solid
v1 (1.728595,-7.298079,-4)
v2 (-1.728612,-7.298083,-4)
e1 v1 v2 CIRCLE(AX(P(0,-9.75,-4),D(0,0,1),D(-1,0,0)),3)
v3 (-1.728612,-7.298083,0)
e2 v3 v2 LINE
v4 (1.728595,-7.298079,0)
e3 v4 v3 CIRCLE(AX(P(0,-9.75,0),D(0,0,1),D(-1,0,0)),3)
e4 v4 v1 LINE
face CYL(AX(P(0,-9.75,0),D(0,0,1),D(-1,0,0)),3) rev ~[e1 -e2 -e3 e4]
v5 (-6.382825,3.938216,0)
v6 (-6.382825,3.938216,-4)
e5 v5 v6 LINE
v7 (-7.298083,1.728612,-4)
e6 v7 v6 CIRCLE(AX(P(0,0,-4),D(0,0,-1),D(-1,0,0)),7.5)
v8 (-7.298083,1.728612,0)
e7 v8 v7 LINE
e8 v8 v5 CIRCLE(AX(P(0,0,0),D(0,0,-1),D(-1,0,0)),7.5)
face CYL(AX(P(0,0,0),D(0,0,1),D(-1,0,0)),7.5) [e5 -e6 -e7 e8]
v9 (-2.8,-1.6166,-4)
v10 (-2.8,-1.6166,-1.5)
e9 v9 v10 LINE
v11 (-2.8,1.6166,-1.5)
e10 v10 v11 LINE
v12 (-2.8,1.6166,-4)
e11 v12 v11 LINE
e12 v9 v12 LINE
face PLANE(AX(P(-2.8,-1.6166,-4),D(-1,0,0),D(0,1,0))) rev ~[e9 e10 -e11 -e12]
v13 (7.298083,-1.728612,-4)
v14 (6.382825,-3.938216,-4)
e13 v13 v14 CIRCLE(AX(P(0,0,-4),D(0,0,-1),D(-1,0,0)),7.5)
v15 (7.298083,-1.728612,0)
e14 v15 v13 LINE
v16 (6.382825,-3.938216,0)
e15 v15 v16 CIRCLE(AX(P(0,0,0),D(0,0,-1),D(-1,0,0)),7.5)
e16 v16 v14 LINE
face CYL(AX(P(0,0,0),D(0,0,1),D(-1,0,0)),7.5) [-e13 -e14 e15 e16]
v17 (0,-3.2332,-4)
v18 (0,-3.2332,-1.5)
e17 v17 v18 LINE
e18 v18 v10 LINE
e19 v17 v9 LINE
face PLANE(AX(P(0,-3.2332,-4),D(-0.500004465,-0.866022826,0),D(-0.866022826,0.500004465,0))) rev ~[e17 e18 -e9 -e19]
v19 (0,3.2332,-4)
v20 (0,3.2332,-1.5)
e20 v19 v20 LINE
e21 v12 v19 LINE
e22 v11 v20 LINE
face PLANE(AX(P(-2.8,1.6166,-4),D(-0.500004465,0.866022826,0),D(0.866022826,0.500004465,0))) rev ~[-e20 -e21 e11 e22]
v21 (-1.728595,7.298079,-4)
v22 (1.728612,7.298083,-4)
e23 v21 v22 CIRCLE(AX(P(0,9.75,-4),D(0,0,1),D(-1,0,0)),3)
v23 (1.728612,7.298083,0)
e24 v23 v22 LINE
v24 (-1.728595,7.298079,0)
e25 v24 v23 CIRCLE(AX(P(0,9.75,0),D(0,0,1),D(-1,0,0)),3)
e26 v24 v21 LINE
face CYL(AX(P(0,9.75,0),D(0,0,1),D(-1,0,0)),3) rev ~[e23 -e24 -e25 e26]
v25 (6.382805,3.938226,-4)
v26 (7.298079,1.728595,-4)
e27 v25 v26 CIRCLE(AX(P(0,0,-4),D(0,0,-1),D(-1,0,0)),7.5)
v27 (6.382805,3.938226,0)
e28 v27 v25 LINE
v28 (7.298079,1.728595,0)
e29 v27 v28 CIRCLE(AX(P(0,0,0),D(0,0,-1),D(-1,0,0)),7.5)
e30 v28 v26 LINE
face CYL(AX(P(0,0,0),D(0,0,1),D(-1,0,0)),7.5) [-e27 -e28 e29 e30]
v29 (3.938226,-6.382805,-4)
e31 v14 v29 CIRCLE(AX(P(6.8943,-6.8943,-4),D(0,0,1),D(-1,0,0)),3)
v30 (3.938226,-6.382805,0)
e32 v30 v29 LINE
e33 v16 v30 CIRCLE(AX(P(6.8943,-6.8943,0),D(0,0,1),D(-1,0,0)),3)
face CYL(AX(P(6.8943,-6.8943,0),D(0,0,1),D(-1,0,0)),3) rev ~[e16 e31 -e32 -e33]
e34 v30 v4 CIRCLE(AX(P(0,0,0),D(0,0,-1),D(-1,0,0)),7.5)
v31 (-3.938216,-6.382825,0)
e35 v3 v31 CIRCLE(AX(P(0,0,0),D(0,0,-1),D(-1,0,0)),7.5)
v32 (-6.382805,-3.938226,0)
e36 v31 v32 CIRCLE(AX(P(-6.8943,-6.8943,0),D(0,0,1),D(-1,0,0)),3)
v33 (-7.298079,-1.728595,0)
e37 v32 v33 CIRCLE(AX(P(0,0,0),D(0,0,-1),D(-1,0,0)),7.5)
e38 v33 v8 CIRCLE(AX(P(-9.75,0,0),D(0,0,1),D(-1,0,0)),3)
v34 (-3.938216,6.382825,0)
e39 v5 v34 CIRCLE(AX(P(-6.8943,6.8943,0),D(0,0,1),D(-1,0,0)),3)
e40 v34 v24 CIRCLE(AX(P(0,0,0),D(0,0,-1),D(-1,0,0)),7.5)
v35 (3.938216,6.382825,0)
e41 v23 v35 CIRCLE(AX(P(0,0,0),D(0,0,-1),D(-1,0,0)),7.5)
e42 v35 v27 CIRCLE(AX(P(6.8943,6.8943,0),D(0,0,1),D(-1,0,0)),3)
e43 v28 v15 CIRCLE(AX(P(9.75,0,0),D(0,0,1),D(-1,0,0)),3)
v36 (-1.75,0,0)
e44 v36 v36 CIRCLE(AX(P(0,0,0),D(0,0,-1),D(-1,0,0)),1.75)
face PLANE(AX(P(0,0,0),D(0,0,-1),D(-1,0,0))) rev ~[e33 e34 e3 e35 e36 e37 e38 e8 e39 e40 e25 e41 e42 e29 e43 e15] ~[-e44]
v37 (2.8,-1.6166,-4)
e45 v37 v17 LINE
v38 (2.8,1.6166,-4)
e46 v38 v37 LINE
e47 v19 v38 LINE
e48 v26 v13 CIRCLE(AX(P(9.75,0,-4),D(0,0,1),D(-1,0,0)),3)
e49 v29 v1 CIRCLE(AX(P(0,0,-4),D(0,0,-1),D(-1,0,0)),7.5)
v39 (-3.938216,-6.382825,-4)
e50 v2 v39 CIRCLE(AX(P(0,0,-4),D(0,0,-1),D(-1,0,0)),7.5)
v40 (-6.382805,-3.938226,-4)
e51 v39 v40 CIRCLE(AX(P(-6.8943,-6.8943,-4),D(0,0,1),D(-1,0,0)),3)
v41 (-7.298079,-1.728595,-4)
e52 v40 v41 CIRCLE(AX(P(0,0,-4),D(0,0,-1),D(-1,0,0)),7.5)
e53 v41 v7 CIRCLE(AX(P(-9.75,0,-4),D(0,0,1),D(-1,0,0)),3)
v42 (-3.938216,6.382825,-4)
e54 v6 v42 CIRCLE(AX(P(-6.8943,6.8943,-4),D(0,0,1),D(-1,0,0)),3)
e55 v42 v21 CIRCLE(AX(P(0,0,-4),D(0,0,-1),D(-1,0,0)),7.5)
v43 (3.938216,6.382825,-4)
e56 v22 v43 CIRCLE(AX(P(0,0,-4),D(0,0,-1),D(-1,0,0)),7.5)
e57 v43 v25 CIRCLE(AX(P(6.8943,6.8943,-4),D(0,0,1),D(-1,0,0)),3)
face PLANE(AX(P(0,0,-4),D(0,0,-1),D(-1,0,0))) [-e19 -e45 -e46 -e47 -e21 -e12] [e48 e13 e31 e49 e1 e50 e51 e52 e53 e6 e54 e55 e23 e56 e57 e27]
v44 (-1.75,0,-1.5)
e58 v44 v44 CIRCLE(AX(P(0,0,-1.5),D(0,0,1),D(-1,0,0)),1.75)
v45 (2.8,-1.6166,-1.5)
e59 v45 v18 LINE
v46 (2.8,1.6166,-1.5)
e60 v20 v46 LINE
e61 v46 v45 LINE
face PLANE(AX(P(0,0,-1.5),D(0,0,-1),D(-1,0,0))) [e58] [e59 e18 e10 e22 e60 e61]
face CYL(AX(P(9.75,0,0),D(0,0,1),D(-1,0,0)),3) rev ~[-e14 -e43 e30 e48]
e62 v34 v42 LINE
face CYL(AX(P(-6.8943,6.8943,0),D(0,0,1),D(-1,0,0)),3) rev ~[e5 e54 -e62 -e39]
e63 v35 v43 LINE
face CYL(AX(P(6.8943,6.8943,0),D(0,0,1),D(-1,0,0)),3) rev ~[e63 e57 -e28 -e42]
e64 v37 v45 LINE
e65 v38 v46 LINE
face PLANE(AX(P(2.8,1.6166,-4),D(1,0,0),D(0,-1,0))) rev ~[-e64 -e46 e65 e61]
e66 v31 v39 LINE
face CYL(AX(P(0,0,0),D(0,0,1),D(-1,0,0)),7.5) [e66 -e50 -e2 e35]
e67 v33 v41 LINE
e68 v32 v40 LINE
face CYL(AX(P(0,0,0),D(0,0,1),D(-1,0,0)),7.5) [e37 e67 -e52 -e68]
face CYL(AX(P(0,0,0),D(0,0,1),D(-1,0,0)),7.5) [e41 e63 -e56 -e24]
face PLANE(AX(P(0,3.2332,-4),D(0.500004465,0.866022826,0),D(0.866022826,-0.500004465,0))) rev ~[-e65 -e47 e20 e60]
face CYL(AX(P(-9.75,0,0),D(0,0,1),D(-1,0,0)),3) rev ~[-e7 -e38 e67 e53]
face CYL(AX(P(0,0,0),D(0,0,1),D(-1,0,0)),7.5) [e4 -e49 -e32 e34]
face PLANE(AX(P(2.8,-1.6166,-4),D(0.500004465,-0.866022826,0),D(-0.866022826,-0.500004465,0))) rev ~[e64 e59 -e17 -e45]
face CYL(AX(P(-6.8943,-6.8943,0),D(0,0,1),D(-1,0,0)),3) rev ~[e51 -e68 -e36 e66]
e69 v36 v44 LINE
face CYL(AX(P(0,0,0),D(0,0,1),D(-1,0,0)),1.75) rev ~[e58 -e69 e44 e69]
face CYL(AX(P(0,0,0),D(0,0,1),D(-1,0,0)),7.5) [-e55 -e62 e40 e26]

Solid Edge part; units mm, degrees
sketch "Sketch1" plane through (0, 0, 0) normal (0, 0, -1) x (-1, 0, 0)
  arc A0 (3.9382, 6.3828) -> (1.7286, 7.2981) centre (0, 0) ccw
  arc A1 (1.7286, 7.2981) -> (-1.7286, 7.2981) centre (0, 9.75) cw
  arc A2 (-1.7286, 7.2981) -> (-3.9382, 6.3828) centre (0, 0) ccw
  arc A3 (-3.9382, 6.3828) -> (-6.3828, 3.9382) centre (-6.8943, 6.8943) cw
  arc A4 (-6.3828, 3.9382) -> (-7.2981, 1.7286) centre (0, 0) ccw
  arc A5 (-7.2981, 1.7286) -> (-7.2981, -1.7286) centre (-9.75, 0) cw
  arc A6 (-7.2981, -1.7286) -> (-6.3828, -3.9382) centre (0, 0) ccw
  arc A7 (-6.3828, -3.9382) -> (-3.9382, -6.3828) centre (-6.8943, -6.8943) cw
  arc A8 (-3.9382, -6.3828) -> (-1.7286, -7.2981) centre (0, 0) ccw
  arc A9 (-1.7286, -7.2981) -> (1.7286, -7.2981) centre (0, -9.75) cw
  arc A10 (1.7286, -7.2981) -> (3.9382, -6.3828) centre (0, 0) ccw
  arc A11 (3.9382, -6.3828) -> (6.3828, -3.9382) centre (6.8943, -6.8943) cw
  arc A12 (6.3828, -3.9382) -> (7.2981, -1.7286) centre (0, 0) ccw
  arc A13 (7.2981, -1.7286) -> (7.2981, 1.7286) centre (9.75, 0) cw
  arc A14 (7.2981, 1.7286) -> (6.3828, 3.9382) centre (0, 0) ccw
  arc A15 (6.3828, 3.9382) -> (3.9382, 6.3828) centre (6.8943, 6.8943) cw
  circle A16 centre (0, 0) radius 1.75
extrude "Protrusion1" add sketch "Sketch1" along normal blind 4
sketch "Sketch2" plane through (0, 0, -4) normal (0, 0, -1) x (1, 0, 0)
  line L0 (2.8, 1.6166) -> (0, 3.2332)
  line L1 (0, 3.2332) -> (-2.8, 1.6166)
  line L2 (-2.8, 1.6166) -> (-2.8, -1.6166)
  line L3 (-2.8, -1.6166) -> (0, -3.2332)
  line L4 (0, -3.2332) -> (2.8, -1.6166)
  line L5 (2.8, -1.6166) -> (2.8, 1.6166)
extrude "ExtrudedCutout_1" cut sketch "Sketch2" against normal blind 2.5
